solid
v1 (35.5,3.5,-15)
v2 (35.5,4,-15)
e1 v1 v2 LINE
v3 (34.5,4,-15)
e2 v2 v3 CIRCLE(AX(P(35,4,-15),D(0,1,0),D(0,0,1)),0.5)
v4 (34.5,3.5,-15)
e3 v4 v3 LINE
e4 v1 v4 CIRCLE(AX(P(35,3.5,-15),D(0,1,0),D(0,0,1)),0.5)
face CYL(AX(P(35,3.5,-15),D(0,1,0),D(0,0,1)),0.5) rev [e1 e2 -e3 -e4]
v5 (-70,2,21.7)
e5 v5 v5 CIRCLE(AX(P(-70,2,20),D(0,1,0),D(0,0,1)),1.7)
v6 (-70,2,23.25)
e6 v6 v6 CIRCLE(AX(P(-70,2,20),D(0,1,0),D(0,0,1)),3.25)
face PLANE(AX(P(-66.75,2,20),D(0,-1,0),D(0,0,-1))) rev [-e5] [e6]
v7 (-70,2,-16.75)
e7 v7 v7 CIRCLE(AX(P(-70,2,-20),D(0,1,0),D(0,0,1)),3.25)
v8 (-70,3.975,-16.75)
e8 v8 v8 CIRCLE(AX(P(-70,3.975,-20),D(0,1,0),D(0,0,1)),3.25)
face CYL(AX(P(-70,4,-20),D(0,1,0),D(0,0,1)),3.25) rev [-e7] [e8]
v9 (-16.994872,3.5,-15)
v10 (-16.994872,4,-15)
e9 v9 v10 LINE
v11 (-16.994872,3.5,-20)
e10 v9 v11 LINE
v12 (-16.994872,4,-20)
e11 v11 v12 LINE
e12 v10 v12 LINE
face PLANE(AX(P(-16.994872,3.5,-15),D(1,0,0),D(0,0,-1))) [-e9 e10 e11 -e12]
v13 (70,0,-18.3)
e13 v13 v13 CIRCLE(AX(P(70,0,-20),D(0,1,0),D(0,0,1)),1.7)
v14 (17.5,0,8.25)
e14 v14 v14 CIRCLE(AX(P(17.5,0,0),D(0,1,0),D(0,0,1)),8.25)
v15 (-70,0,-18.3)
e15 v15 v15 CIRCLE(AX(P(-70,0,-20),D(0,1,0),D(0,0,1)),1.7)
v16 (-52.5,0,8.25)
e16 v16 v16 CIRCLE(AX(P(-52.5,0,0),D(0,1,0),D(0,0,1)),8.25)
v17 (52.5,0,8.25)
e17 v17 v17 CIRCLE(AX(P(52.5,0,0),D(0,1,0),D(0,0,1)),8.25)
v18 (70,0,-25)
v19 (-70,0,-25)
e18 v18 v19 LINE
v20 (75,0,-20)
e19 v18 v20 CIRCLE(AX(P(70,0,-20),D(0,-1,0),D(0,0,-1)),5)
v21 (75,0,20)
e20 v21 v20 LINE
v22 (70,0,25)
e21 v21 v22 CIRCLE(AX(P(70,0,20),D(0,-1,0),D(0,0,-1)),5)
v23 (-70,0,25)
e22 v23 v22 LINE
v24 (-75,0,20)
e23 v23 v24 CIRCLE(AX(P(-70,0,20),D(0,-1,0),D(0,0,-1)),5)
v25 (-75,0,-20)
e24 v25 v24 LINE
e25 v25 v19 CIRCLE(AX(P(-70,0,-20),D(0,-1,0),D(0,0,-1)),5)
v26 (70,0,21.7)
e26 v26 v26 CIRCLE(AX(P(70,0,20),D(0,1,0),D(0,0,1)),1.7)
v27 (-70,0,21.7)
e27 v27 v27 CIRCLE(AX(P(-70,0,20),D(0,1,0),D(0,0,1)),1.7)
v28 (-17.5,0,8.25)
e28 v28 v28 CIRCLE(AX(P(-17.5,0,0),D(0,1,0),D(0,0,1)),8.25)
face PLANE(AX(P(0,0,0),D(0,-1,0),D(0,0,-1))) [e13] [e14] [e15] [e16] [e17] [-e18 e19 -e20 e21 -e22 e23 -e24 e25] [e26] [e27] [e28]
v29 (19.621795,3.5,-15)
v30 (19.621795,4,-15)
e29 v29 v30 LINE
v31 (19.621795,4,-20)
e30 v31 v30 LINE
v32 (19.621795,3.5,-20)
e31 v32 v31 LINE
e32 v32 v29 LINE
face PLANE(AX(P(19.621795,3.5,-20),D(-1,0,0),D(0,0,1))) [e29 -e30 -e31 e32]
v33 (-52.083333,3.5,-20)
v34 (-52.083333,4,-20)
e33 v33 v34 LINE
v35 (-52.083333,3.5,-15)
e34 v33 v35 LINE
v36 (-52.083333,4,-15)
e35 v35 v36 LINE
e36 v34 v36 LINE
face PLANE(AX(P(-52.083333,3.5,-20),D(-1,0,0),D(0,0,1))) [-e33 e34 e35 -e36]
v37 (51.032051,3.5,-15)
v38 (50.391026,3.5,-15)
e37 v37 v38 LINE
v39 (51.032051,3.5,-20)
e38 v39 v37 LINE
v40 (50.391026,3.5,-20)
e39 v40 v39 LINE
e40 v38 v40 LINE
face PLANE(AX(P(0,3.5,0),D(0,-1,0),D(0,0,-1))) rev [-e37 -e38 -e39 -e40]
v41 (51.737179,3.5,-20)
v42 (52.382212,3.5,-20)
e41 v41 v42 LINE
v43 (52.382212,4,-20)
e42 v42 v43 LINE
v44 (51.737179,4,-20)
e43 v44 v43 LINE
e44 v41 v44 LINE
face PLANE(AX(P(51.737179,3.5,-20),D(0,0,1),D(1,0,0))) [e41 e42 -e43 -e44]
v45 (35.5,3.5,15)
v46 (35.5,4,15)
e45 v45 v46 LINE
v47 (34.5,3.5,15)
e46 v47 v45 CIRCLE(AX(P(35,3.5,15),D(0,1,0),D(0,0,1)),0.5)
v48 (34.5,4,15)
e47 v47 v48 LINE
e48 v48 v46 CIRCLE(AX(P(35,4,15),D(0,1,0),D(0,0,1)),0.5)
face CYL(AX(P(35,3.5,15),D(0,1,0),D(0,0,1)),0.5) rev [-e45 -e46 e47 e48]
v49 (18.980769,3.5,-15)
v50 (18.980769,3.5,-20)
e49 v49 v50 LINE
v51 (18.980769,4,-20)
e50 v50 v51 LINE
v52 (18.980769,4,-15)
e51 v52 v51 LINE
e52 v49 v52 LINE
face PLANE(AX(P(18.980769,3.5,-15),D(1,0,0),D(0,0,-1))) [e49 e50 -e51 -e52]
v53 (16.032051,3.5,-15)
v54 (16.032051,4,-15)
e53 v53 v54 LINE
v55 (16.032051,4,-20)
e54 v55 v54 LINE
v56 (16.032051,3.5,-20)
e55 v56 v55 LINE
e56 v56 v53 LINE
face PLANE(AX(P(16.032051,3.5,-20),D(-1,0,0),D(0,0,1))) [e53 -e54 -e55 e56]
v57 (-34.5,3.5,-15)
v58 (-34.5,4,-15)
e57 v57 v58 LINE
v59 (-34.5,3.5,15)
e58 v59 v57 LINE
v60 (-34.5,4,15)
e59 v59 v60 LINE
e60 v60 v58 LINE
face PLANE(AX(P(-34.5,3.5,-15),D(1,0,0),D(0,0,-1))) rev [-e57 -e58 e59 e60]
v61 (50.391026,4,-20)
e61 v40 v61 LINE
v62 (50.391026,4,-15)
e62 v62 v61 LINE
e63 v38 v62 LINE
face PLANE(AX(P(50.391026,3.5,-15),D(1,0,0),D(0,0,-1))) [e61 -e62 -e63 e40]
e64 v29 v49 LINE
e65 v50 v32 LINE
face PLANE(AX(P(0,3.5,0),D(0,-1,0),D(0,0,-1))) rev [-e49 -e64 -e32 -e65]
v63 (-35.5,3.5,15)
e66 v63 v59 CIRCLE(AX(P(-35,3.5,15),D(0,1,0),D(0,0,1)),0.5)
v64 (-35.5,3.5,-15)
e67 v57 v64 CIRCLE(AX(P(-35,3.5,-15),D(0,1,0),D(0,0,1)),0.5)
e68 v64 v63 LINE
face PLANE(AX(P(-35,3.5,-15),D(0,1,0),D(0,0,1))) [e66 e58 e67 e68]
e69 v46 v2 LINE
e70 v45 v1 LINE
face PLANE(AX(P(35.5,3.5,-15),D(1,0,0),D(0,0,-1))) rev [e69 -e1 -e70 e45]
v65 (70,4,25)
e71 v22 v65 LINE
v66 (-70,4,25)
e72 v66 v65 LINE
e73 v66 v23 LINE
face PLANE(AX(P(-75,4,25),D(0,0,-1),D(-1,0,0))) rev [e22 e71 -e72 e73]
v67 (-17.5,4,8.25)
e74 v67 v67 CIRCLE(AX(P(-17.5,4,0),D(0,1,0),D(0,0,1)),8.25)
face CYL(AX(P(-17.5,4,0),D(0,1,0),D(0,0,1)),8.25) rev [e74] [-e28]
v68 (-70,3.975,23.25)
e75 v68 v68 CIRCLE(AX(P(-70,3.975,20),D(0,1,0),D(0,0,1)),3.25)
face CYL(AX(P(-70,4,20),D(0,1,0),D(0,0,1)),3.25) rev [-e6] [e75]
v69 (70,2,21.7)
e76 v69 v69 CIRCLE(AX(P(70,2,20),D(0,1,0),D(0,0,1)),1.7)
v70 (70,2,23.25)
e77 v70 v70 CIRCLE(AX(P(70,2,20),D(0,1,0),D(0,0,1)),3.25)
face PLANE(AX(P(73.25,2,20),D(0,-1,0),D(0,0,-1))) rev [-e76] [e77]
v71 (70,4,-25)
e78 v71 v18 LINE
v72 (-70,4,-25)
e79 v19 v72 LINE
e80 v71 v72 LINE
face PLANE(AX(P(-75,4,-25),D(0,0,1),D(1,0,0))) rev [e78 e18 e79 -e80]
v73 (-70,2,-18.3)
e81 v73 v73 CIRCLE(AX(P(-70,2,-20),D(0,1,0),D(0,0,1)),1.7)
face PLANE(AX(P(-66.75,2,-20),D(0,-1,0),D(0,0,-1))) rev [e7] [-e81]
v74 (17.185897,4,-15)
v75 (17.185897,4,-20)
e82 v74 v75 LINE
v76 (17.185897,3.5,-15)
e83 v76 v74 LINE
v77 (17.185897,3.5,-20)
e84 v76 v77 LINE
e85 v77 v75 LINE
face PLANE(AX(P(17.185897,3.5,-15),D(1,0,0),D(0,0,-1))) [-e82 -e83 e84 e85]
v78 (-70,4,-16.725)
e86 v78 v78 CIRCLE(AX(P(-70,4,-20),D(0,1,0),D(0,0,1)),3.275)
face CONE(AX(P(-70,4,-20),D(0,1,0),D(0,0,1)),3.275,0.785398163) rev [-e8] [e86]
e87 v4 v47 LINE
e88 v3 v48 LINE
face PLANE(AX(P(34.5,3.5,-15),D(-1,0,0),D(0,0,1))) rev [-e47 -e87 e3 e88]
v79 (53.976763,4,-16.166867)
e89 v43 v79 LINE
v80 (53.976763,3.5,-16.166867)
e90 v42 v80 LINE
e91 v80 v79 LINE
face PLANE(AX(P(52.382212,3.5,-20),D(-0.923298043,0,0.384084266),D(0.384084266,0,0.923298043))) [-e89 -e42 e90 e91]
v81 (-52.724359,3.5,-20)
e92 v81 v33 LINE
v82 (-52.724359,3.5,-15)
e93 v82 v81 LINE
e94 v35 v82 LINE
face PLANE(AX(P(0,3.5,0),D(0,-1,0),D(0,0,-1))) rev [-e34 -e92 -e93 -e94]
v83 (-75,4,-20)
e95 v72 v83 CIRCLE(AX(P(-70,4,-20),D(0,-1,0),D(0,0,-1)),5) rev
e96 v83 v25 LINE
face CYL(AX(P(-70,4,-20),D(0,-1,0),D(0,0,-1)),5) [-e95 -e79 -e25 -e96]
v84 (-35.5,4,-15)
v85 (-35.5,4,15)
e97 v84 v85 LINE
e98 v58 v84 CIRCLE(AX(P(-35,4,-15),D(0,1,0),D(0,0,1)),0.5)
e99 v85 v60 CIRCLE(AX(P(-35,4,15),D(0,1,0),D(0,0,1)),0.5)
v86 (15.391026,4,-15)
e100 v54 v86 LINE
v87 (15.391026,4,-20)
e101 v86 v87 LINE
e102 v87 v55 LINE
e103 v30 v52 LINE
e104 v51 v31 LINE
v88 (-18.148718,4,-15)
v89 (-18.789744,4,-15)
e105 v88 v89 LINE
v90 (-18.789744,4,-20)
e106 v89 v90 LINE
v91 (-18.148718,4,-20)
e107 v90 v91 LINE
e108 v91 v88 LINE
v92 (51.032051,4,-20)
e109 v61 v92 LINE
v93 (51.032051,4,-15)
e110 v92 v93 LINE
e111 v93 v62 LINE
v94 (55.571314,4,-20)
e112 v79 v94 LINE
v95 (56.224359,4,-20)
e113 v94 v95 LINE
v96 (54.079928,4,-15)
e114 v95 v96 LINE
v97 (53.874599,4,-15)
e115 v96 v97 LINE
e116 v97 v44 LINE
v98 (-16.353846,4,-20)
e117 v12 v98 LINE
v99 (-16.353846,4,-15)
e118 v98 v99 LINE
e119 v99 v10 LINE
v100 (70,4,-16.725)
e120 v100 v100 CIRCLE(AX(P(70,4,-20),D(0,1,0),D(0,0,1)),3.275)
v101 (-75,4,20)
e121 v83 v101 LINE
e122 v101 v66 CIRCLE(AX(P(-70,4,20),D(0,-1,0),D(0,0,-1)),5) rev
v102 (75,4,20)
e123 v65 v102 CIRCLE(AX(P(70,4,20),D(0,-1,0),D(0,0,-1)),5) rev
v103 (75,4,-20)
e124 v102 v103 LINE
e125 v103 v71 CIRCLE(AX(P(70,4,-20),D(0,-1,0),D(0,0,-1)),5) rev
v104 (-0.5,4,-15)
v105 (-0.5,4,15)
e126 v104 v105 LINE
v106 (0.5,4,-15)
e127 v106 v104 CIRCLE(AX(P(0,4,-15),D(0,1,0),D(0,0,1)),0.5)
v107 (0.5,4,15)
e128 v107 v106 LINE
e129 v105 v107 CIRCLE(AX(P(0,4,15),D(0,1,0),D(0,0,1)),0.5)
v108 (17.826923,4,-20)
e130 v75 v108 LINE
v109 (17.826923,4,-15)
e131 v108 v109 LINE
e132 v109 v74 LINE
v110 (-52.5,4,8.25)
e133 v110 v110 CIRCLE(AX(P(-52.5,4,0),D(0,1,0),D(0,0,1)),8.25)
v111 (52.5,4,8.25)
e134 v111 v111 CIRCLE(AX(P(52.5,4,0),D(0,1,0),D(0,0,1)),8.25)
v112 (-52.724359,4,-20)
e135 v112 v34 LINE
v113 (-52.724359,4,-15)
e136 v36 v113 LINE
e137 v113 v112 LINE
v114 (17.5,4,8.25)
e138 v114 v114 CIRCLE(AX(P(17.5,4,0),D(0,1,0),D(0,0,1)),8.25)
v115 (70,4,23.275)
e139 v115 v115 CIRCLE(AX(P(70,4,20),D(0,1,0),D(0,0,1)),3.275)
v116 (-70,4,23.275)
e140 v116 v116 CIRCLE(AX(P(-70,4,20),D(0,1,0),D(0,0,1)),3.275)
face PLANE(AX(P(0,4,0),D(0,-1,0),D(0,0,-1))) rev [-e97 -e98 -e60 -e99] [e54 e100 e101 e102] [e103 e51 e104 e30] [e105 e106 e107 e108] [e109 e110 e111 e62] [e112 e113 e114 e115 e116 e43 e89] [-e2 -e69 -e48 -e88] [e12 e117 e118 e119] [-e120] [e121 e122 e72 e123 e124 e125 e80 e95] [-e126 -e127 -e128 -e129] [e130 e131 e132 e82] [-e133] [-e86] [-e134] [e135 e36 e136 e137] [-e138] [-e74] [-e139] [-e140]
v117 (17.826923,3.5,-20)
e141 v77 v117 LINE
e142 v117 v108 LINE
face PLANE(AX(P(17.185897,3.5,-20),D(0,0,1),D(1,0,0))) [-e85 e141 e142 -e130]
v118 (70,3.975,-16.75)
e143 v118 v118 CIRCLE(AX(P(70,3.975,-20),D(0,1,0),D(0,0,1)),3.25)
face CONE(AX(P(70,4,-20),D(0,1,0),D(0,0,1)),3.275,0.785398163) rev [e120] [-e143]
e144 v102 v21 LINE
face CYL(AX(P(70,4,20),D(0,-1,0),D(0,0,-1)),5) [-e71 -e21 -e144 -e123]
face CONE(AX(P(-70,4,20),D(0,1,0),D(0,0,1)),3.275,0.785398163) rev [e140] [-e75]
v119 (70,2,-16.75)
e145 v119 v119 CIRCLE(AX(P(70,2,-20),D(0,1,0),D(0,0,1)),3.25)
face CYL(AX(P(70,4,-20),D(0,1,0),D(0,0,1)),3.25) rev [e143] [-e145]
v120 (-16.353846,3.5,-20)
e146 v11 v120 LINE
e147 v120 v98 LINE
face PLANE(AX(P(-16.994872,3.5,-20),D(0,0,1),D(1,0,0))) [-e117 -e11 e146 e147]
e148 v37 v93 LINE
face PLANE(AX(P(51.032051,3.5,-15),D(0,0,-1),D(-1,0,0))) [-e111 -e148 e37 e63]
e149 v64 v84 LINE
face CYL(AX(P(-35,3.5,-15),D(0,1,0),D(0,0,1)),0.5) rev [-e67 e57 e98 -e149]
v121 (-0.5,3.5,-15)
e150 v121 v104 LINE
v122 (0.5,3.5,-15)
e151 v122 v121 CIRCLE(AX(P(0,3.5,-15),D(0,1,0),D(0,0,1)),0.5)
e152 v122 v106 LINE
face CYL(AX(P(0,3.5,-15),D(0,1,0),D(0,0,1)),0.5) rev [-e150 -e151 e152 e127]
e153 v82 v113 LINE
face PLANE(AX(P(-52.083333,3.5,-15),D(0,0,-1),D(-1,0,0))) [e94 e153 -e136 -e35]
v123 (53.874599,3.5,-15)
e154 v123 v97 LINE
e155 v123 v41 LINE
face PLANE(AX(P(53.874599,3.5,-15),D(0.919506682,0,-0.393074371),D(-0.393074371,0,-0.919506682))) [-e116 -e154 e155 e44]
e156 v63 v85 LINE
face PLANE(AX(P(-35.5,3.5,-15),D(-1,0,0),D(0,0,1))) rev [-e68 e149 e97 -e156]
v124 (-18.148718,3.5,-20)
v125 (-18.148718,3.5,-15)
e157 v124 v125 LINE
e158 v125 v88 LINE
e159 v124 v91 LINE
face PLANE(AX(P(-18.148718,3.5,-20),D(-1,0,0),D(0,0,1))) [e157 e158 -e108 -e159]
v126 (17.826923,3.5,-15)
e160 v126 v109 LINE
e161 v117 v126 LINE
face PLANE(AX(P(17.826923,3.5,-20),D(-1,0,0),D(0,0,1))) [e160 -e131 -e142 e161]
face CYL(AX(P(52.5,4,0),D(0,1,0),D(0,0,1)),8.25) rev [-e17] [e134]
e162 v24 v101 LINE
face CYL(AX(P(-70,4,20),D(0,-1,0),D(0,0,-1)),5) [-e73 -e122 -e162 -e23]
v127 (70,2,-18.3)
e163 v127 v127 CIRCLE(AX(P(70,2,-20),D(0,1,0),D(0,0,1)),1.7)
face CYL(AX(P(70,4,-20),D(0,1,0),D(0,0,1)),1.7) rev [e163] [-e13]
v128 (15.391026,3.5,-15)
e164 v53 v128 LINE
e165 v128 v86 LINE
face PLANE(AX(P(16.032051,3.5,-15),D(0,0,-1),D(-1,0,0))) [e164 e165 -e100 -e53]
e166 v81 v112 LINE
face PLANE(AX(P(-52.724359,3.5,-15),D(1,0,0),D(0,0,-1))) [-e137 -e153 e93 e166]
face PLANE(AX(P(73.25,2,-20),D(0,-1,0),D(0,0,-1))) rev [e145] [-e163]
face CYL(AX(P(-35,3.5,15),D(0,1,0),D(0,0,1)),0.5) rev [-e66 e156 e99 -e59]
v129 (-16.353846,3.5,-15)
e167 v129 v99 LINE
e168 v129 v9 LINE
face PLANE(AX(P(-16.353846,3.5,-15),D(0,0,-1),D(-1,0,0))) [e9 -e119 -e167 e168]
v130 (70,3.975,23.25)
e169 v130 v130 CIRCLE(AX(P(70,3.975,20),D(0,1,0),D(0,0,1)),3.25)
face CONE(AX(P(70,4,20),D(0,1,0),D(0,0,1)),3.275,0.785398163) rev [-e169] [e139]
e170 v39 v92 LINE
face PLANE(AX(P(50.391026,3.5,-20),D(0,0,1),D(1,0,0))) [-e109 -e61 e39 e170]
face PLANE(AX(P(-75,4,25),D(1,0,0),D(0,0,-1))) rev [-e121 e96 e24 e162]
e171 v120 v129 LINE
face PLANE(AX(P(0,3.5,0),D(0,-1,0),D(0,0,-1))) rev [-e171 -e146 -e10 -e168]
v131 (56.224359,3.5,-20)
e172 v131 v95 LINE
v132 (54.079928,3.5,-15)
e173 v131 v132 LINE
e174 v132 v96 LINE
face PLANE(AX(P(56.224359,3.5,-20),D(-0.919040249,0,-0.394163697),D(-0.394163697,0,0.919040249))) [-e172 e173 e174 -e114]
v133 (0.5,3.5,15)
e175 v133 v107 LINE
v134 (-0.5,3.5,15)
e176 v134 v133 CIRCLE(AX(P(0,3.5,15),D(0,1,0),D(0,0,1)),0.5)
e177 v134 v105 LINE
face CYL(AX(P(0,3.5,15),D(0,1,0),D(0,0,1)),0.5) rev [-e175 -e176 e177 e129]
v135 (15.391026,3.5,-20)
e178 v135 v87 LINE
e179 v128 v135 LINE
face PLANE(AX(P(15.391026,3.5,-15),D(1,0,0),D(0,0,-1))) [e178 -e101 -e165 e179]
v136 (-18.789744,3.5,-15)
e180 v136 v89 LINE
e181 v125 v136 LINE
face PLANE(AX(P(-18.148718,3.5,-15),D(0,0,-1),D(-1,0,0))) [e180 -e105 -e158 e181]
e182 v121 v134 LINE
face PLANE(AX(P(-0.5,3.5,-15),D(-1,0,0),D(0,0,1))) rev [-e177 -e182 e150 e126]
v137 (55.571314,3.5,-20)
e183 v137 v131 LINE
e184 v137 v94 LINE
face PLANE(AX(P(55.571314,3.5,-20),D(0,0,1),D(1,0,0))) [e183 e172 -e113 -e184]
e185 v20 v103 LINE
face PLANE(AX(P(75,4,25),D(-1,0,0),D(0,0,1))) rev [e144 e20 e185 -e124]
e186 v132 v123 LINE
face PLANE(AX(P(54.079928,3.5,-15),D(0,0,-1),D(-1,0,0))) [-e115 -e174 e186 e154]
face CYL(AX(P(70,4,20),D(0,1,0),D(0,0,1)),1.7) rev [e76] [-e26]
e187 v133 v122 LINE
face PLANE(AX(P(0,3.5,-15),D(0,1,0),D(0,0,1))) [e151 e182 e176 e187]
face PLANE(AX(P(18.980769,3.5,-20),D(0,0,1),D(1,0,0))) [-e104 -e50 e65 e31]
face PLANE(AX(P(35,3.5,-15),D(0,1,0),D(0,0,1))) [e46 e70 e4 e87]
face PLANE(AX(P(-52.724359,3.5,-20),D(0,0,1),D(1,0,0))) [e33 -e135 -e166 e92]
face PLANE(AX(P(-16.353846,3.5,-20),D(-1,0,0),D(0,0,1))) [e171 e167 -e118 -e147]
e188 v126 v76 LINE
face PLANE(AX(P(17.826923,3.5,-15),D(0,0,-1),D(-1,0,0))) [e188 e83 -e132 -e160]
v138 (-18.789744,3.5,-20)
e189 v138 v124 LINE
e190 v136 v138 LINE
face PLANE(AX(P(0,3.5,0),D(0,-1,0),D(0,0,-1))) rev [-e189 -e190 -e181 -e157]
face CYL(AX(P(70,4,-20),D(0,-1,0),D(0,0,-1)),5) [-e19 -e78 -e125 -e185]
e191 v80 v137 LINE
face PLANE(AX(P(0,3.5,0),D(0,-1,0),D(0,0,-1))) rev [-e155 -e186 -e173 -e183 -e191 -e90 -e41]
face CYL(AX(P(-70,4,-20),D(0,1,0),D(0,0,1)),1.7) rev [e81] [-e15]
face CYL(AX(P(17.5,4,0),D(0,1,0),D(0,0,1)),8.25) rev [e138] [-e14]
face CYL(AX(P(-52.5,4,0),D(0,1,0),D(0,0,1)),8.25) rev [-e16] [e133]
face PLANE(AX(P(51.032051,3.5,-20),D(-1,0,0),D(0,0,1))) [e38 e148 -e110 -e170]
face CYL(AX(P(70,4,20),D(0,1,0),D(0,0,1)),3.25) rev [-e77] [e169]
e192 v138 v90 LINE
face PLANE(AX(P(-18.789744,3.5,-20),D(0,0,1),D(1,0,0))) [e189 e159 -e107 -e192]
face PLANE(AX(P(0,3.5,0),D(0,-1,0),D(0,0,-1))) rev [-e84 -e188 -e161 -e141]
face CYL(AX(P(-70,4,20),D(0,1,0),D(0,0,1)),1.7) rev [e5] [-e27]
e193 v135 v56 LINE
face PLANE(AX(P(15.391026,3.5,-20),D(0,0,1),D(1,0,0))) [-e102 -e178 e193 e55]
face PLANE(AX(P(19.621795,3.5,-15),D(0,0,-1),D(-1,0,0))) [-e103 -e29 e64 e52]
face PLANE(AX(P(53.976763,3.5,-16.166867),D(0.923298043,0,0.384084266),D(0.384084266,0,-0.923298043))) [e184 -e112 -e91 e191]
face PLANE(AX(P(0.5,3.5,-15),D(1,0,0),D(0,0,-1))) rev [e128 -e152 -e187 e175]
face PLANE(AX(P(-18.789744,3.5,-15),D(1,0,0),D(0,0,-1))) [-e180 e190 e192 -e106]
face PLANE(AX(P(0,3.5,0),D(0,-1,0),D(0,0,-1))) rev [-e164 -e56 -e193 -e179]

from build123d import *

# Parameters (mm, degrees)
SKETCH1_W              = 150
SKETCH1_H              = 50
BODY_DEPTH             = 4
EDGE_FILLETS_R         = 5
GX16_HOLE_D            = 16.5
GX16_PATTERN_COUNT     = 4
GX16_PATTERN_PITCH     = 35
DESIGN_CUTOUT_SKETCH_W = 0.641025641
DESIGN_CUTOUT_SKETCH_H = 5
DESIGN_CUTOUT_DEPTH    = 0.5


# Read off the part's stored shape, not the designer's step: mounting_holes
with BuildPart() as part:
    # Sketch1 → body (new body)
    with BuildSketch(Plane(origin=(0, 0, 0), x_dir=(1, 0, 0), z_dir=(0, 1, 0))):
        Rectangle(SKETCH1_W, SKETCH1_H)
    extrude(amount=BODY_DEPTH)

    # mounting_holes outline → mounting_holes (revolve, cut)
    with BuildSketch(Plane(origin=(70, 0, 20), x_dir=(1, 0, 0), z_dir=(0, 0, 1))):
        Polygon((0, 0), (1.7, 0), (1.7, 2), (3.25, 2), (3.25, 3.975), (3.275, 4), (0, 4), align=None)
    revolve(axis=Axis((70, 0, 20), (0, 1, 0)), mode=Mode.SUBTRACT)

    # mounting_holes 2 outline → mounting_holes 2 (revolve, cut)
    with BuildSketch(Plane(origin=(-70, 0, -20), x_dir=(1, 0, 0), z_dir=(0, 0, 1))):
        Polygon((0, 4), (0, 0), (1.7, 0), (1.7, 2), (3.25, 2), (3.25, 3.975), (3.275, 4), align=None)
    revolve(axis=Axis((-70, 0, -20), (0, 1, 0)), mode=Mode.SUBTRACT)

    # mounting_holes 3 outline → mounting_holes 3 (revolve, cut)
    with BuildSketch(Plane(origin=(70, 0, -20), x_dir=(1, 0, 0), z_dir=(0, 0, 1))):
        Polygon((0, 4), (0, 0), (1.7, 0), (1.7, 2), (3.25, 2), (3.25, 3.975), (3.275, 4), align=None)
    revolve(axis=Axis((70, 0, -20), (0, 1, 0)), mode=Mode.SUBTRACT)

    # mounting_holes 4 outline → mounting_holes 4 (revolve, cut)
    with BuildSketch(Plane(origin=(-70, 0, 20), x_dir=(1, 0, 0), z_dir=(0, 0, 1))):
        Polygon((0, 4), (0, 0), (1.7, 0), (1.7, 2), (3.25, 2), (3.25, 3.975), (3.275, 4), align=None)
    revolve(axis=Axis((-70, 0, 20), (0, 1, 0)), mode=Mode.SUBTRACT)

    # edge_fillets
    edge_fillets_edges = [part.edges().sort_by_distance(p)[0] for p in [
        (75, 2, 25),
        (-75, 2, 25),
        (-75, 2, -25),
        (75, 2, -25),
    ]]
    fillet(edge_fillets_edges, radius=EDGE_FILLETS_R)

    # gx16_hole (through all)
    with Locations(Plane(origin=(0, 4, 0), x_dir=(1, 0, 0), z_dir=(0, 1, 0))):
        with Locations((-52.5, 0)):
            gx16_hole = Hole(GX16_HOLE_D / 2)

    # gx16_pattern: gx16_hole ×4
    with Locations(*[(i * GX16_PATTERN_PITCH, 0, 0) for i in range(1, GX16_PATTERN_COUNT)]):
        add(gx16_hole, mode=Mode.SUBTRACT)

    # design_cutout_sketch → design_cutout (cut)
    with BuildSketch(Plane(origin=(0, 4, 0), x_dir=(1, 0, 0), z_dir=(0, 1, 0))):
        with BuildLine():
            Line((-34.5, 15), (-34.5, -15))
            ThreePointArc((-34.5, -15), (-35, -15.5), (-35.5, -15))
            Line((-35.5, -15), (-35.5, 15))
            ThreePointArc((-35.5, 15), (-35, 15.5), (-34.5, 15))
        make_face()
        with BuildLine():
            Line((0.5, 15), (0.5, -15))
            ThreePointArc((0.5, -15), (0, -15.5), (-0.5, -15))
            Line((-0.5, -15), (-0.5, 15))
            ThreePointArc((-0.5, 15), (0, 15.5), (0.5, 15))
        make_face()
        with BuildLine():
            Line((35.5, 15), (35.5, -15))
            ThreePointArc((35.5, -15), (35, -15.5), (34.5, -15))
            Line((34.5, -15), (34.5, 15))
            ThreePointArc((34.5, 15), (35, 15.5), (35.5, 15))
        make_face()
        with Locations((-52.403846154, 17.5)):
            Rectangle(DESIGN_CUTOUT_SKETCH_W, DESIGN_CUTOUT_SKETCH_H)
        with Locations((-18.46923077, 17.5)):
            Rectangle(DESIGN_CUTOUT_SKETCH_W, DESIGN_CUTOUT_SKETCH_H)
        with Locations((-16.674358975, 17.5)):
            Rectangle(DESIGN_CUTOUT_SKETCH_W, DESIGN_CUTOUT_SKETCH_H)
        with Locations((15.711538462, 17.5)):
            Rectangle(DESIGN_CUTOUT_SKETCH_W, DESIGN_CUTOUT_SKETCH_H)
        with Locations((17.506410257, 17.5)):
            Rectangle(DESIGN_CUTOUT_SKETCH_W, DESIGN_CUTOUT_SKETCH_H)
        with Locations((19.301282052, 17.5)):
            Rectangle(DESIGN_CUTOUT_SKETCH_W, DESIGN_CUTOUT_SKETCH_H)
        with Locations((50.711538462, 17.5)):
            Rectangle(DESIGN_CUTOUT_SKETCH_W, DESIGN_CUTOUT_SKETCH_H)
        Polygon((51.737179487, 20), (52.382211538, 20), (53.976762821, 16.166866987), (55.571314103, 20), (56.224358974, 20), (54.079927885, 15), (53.874599359, 15), align=None)
    extrude(amount=-DESIGN_CUTOUT_DEPTH, mode=Mode.SUBTRACT)


solid = part.part
